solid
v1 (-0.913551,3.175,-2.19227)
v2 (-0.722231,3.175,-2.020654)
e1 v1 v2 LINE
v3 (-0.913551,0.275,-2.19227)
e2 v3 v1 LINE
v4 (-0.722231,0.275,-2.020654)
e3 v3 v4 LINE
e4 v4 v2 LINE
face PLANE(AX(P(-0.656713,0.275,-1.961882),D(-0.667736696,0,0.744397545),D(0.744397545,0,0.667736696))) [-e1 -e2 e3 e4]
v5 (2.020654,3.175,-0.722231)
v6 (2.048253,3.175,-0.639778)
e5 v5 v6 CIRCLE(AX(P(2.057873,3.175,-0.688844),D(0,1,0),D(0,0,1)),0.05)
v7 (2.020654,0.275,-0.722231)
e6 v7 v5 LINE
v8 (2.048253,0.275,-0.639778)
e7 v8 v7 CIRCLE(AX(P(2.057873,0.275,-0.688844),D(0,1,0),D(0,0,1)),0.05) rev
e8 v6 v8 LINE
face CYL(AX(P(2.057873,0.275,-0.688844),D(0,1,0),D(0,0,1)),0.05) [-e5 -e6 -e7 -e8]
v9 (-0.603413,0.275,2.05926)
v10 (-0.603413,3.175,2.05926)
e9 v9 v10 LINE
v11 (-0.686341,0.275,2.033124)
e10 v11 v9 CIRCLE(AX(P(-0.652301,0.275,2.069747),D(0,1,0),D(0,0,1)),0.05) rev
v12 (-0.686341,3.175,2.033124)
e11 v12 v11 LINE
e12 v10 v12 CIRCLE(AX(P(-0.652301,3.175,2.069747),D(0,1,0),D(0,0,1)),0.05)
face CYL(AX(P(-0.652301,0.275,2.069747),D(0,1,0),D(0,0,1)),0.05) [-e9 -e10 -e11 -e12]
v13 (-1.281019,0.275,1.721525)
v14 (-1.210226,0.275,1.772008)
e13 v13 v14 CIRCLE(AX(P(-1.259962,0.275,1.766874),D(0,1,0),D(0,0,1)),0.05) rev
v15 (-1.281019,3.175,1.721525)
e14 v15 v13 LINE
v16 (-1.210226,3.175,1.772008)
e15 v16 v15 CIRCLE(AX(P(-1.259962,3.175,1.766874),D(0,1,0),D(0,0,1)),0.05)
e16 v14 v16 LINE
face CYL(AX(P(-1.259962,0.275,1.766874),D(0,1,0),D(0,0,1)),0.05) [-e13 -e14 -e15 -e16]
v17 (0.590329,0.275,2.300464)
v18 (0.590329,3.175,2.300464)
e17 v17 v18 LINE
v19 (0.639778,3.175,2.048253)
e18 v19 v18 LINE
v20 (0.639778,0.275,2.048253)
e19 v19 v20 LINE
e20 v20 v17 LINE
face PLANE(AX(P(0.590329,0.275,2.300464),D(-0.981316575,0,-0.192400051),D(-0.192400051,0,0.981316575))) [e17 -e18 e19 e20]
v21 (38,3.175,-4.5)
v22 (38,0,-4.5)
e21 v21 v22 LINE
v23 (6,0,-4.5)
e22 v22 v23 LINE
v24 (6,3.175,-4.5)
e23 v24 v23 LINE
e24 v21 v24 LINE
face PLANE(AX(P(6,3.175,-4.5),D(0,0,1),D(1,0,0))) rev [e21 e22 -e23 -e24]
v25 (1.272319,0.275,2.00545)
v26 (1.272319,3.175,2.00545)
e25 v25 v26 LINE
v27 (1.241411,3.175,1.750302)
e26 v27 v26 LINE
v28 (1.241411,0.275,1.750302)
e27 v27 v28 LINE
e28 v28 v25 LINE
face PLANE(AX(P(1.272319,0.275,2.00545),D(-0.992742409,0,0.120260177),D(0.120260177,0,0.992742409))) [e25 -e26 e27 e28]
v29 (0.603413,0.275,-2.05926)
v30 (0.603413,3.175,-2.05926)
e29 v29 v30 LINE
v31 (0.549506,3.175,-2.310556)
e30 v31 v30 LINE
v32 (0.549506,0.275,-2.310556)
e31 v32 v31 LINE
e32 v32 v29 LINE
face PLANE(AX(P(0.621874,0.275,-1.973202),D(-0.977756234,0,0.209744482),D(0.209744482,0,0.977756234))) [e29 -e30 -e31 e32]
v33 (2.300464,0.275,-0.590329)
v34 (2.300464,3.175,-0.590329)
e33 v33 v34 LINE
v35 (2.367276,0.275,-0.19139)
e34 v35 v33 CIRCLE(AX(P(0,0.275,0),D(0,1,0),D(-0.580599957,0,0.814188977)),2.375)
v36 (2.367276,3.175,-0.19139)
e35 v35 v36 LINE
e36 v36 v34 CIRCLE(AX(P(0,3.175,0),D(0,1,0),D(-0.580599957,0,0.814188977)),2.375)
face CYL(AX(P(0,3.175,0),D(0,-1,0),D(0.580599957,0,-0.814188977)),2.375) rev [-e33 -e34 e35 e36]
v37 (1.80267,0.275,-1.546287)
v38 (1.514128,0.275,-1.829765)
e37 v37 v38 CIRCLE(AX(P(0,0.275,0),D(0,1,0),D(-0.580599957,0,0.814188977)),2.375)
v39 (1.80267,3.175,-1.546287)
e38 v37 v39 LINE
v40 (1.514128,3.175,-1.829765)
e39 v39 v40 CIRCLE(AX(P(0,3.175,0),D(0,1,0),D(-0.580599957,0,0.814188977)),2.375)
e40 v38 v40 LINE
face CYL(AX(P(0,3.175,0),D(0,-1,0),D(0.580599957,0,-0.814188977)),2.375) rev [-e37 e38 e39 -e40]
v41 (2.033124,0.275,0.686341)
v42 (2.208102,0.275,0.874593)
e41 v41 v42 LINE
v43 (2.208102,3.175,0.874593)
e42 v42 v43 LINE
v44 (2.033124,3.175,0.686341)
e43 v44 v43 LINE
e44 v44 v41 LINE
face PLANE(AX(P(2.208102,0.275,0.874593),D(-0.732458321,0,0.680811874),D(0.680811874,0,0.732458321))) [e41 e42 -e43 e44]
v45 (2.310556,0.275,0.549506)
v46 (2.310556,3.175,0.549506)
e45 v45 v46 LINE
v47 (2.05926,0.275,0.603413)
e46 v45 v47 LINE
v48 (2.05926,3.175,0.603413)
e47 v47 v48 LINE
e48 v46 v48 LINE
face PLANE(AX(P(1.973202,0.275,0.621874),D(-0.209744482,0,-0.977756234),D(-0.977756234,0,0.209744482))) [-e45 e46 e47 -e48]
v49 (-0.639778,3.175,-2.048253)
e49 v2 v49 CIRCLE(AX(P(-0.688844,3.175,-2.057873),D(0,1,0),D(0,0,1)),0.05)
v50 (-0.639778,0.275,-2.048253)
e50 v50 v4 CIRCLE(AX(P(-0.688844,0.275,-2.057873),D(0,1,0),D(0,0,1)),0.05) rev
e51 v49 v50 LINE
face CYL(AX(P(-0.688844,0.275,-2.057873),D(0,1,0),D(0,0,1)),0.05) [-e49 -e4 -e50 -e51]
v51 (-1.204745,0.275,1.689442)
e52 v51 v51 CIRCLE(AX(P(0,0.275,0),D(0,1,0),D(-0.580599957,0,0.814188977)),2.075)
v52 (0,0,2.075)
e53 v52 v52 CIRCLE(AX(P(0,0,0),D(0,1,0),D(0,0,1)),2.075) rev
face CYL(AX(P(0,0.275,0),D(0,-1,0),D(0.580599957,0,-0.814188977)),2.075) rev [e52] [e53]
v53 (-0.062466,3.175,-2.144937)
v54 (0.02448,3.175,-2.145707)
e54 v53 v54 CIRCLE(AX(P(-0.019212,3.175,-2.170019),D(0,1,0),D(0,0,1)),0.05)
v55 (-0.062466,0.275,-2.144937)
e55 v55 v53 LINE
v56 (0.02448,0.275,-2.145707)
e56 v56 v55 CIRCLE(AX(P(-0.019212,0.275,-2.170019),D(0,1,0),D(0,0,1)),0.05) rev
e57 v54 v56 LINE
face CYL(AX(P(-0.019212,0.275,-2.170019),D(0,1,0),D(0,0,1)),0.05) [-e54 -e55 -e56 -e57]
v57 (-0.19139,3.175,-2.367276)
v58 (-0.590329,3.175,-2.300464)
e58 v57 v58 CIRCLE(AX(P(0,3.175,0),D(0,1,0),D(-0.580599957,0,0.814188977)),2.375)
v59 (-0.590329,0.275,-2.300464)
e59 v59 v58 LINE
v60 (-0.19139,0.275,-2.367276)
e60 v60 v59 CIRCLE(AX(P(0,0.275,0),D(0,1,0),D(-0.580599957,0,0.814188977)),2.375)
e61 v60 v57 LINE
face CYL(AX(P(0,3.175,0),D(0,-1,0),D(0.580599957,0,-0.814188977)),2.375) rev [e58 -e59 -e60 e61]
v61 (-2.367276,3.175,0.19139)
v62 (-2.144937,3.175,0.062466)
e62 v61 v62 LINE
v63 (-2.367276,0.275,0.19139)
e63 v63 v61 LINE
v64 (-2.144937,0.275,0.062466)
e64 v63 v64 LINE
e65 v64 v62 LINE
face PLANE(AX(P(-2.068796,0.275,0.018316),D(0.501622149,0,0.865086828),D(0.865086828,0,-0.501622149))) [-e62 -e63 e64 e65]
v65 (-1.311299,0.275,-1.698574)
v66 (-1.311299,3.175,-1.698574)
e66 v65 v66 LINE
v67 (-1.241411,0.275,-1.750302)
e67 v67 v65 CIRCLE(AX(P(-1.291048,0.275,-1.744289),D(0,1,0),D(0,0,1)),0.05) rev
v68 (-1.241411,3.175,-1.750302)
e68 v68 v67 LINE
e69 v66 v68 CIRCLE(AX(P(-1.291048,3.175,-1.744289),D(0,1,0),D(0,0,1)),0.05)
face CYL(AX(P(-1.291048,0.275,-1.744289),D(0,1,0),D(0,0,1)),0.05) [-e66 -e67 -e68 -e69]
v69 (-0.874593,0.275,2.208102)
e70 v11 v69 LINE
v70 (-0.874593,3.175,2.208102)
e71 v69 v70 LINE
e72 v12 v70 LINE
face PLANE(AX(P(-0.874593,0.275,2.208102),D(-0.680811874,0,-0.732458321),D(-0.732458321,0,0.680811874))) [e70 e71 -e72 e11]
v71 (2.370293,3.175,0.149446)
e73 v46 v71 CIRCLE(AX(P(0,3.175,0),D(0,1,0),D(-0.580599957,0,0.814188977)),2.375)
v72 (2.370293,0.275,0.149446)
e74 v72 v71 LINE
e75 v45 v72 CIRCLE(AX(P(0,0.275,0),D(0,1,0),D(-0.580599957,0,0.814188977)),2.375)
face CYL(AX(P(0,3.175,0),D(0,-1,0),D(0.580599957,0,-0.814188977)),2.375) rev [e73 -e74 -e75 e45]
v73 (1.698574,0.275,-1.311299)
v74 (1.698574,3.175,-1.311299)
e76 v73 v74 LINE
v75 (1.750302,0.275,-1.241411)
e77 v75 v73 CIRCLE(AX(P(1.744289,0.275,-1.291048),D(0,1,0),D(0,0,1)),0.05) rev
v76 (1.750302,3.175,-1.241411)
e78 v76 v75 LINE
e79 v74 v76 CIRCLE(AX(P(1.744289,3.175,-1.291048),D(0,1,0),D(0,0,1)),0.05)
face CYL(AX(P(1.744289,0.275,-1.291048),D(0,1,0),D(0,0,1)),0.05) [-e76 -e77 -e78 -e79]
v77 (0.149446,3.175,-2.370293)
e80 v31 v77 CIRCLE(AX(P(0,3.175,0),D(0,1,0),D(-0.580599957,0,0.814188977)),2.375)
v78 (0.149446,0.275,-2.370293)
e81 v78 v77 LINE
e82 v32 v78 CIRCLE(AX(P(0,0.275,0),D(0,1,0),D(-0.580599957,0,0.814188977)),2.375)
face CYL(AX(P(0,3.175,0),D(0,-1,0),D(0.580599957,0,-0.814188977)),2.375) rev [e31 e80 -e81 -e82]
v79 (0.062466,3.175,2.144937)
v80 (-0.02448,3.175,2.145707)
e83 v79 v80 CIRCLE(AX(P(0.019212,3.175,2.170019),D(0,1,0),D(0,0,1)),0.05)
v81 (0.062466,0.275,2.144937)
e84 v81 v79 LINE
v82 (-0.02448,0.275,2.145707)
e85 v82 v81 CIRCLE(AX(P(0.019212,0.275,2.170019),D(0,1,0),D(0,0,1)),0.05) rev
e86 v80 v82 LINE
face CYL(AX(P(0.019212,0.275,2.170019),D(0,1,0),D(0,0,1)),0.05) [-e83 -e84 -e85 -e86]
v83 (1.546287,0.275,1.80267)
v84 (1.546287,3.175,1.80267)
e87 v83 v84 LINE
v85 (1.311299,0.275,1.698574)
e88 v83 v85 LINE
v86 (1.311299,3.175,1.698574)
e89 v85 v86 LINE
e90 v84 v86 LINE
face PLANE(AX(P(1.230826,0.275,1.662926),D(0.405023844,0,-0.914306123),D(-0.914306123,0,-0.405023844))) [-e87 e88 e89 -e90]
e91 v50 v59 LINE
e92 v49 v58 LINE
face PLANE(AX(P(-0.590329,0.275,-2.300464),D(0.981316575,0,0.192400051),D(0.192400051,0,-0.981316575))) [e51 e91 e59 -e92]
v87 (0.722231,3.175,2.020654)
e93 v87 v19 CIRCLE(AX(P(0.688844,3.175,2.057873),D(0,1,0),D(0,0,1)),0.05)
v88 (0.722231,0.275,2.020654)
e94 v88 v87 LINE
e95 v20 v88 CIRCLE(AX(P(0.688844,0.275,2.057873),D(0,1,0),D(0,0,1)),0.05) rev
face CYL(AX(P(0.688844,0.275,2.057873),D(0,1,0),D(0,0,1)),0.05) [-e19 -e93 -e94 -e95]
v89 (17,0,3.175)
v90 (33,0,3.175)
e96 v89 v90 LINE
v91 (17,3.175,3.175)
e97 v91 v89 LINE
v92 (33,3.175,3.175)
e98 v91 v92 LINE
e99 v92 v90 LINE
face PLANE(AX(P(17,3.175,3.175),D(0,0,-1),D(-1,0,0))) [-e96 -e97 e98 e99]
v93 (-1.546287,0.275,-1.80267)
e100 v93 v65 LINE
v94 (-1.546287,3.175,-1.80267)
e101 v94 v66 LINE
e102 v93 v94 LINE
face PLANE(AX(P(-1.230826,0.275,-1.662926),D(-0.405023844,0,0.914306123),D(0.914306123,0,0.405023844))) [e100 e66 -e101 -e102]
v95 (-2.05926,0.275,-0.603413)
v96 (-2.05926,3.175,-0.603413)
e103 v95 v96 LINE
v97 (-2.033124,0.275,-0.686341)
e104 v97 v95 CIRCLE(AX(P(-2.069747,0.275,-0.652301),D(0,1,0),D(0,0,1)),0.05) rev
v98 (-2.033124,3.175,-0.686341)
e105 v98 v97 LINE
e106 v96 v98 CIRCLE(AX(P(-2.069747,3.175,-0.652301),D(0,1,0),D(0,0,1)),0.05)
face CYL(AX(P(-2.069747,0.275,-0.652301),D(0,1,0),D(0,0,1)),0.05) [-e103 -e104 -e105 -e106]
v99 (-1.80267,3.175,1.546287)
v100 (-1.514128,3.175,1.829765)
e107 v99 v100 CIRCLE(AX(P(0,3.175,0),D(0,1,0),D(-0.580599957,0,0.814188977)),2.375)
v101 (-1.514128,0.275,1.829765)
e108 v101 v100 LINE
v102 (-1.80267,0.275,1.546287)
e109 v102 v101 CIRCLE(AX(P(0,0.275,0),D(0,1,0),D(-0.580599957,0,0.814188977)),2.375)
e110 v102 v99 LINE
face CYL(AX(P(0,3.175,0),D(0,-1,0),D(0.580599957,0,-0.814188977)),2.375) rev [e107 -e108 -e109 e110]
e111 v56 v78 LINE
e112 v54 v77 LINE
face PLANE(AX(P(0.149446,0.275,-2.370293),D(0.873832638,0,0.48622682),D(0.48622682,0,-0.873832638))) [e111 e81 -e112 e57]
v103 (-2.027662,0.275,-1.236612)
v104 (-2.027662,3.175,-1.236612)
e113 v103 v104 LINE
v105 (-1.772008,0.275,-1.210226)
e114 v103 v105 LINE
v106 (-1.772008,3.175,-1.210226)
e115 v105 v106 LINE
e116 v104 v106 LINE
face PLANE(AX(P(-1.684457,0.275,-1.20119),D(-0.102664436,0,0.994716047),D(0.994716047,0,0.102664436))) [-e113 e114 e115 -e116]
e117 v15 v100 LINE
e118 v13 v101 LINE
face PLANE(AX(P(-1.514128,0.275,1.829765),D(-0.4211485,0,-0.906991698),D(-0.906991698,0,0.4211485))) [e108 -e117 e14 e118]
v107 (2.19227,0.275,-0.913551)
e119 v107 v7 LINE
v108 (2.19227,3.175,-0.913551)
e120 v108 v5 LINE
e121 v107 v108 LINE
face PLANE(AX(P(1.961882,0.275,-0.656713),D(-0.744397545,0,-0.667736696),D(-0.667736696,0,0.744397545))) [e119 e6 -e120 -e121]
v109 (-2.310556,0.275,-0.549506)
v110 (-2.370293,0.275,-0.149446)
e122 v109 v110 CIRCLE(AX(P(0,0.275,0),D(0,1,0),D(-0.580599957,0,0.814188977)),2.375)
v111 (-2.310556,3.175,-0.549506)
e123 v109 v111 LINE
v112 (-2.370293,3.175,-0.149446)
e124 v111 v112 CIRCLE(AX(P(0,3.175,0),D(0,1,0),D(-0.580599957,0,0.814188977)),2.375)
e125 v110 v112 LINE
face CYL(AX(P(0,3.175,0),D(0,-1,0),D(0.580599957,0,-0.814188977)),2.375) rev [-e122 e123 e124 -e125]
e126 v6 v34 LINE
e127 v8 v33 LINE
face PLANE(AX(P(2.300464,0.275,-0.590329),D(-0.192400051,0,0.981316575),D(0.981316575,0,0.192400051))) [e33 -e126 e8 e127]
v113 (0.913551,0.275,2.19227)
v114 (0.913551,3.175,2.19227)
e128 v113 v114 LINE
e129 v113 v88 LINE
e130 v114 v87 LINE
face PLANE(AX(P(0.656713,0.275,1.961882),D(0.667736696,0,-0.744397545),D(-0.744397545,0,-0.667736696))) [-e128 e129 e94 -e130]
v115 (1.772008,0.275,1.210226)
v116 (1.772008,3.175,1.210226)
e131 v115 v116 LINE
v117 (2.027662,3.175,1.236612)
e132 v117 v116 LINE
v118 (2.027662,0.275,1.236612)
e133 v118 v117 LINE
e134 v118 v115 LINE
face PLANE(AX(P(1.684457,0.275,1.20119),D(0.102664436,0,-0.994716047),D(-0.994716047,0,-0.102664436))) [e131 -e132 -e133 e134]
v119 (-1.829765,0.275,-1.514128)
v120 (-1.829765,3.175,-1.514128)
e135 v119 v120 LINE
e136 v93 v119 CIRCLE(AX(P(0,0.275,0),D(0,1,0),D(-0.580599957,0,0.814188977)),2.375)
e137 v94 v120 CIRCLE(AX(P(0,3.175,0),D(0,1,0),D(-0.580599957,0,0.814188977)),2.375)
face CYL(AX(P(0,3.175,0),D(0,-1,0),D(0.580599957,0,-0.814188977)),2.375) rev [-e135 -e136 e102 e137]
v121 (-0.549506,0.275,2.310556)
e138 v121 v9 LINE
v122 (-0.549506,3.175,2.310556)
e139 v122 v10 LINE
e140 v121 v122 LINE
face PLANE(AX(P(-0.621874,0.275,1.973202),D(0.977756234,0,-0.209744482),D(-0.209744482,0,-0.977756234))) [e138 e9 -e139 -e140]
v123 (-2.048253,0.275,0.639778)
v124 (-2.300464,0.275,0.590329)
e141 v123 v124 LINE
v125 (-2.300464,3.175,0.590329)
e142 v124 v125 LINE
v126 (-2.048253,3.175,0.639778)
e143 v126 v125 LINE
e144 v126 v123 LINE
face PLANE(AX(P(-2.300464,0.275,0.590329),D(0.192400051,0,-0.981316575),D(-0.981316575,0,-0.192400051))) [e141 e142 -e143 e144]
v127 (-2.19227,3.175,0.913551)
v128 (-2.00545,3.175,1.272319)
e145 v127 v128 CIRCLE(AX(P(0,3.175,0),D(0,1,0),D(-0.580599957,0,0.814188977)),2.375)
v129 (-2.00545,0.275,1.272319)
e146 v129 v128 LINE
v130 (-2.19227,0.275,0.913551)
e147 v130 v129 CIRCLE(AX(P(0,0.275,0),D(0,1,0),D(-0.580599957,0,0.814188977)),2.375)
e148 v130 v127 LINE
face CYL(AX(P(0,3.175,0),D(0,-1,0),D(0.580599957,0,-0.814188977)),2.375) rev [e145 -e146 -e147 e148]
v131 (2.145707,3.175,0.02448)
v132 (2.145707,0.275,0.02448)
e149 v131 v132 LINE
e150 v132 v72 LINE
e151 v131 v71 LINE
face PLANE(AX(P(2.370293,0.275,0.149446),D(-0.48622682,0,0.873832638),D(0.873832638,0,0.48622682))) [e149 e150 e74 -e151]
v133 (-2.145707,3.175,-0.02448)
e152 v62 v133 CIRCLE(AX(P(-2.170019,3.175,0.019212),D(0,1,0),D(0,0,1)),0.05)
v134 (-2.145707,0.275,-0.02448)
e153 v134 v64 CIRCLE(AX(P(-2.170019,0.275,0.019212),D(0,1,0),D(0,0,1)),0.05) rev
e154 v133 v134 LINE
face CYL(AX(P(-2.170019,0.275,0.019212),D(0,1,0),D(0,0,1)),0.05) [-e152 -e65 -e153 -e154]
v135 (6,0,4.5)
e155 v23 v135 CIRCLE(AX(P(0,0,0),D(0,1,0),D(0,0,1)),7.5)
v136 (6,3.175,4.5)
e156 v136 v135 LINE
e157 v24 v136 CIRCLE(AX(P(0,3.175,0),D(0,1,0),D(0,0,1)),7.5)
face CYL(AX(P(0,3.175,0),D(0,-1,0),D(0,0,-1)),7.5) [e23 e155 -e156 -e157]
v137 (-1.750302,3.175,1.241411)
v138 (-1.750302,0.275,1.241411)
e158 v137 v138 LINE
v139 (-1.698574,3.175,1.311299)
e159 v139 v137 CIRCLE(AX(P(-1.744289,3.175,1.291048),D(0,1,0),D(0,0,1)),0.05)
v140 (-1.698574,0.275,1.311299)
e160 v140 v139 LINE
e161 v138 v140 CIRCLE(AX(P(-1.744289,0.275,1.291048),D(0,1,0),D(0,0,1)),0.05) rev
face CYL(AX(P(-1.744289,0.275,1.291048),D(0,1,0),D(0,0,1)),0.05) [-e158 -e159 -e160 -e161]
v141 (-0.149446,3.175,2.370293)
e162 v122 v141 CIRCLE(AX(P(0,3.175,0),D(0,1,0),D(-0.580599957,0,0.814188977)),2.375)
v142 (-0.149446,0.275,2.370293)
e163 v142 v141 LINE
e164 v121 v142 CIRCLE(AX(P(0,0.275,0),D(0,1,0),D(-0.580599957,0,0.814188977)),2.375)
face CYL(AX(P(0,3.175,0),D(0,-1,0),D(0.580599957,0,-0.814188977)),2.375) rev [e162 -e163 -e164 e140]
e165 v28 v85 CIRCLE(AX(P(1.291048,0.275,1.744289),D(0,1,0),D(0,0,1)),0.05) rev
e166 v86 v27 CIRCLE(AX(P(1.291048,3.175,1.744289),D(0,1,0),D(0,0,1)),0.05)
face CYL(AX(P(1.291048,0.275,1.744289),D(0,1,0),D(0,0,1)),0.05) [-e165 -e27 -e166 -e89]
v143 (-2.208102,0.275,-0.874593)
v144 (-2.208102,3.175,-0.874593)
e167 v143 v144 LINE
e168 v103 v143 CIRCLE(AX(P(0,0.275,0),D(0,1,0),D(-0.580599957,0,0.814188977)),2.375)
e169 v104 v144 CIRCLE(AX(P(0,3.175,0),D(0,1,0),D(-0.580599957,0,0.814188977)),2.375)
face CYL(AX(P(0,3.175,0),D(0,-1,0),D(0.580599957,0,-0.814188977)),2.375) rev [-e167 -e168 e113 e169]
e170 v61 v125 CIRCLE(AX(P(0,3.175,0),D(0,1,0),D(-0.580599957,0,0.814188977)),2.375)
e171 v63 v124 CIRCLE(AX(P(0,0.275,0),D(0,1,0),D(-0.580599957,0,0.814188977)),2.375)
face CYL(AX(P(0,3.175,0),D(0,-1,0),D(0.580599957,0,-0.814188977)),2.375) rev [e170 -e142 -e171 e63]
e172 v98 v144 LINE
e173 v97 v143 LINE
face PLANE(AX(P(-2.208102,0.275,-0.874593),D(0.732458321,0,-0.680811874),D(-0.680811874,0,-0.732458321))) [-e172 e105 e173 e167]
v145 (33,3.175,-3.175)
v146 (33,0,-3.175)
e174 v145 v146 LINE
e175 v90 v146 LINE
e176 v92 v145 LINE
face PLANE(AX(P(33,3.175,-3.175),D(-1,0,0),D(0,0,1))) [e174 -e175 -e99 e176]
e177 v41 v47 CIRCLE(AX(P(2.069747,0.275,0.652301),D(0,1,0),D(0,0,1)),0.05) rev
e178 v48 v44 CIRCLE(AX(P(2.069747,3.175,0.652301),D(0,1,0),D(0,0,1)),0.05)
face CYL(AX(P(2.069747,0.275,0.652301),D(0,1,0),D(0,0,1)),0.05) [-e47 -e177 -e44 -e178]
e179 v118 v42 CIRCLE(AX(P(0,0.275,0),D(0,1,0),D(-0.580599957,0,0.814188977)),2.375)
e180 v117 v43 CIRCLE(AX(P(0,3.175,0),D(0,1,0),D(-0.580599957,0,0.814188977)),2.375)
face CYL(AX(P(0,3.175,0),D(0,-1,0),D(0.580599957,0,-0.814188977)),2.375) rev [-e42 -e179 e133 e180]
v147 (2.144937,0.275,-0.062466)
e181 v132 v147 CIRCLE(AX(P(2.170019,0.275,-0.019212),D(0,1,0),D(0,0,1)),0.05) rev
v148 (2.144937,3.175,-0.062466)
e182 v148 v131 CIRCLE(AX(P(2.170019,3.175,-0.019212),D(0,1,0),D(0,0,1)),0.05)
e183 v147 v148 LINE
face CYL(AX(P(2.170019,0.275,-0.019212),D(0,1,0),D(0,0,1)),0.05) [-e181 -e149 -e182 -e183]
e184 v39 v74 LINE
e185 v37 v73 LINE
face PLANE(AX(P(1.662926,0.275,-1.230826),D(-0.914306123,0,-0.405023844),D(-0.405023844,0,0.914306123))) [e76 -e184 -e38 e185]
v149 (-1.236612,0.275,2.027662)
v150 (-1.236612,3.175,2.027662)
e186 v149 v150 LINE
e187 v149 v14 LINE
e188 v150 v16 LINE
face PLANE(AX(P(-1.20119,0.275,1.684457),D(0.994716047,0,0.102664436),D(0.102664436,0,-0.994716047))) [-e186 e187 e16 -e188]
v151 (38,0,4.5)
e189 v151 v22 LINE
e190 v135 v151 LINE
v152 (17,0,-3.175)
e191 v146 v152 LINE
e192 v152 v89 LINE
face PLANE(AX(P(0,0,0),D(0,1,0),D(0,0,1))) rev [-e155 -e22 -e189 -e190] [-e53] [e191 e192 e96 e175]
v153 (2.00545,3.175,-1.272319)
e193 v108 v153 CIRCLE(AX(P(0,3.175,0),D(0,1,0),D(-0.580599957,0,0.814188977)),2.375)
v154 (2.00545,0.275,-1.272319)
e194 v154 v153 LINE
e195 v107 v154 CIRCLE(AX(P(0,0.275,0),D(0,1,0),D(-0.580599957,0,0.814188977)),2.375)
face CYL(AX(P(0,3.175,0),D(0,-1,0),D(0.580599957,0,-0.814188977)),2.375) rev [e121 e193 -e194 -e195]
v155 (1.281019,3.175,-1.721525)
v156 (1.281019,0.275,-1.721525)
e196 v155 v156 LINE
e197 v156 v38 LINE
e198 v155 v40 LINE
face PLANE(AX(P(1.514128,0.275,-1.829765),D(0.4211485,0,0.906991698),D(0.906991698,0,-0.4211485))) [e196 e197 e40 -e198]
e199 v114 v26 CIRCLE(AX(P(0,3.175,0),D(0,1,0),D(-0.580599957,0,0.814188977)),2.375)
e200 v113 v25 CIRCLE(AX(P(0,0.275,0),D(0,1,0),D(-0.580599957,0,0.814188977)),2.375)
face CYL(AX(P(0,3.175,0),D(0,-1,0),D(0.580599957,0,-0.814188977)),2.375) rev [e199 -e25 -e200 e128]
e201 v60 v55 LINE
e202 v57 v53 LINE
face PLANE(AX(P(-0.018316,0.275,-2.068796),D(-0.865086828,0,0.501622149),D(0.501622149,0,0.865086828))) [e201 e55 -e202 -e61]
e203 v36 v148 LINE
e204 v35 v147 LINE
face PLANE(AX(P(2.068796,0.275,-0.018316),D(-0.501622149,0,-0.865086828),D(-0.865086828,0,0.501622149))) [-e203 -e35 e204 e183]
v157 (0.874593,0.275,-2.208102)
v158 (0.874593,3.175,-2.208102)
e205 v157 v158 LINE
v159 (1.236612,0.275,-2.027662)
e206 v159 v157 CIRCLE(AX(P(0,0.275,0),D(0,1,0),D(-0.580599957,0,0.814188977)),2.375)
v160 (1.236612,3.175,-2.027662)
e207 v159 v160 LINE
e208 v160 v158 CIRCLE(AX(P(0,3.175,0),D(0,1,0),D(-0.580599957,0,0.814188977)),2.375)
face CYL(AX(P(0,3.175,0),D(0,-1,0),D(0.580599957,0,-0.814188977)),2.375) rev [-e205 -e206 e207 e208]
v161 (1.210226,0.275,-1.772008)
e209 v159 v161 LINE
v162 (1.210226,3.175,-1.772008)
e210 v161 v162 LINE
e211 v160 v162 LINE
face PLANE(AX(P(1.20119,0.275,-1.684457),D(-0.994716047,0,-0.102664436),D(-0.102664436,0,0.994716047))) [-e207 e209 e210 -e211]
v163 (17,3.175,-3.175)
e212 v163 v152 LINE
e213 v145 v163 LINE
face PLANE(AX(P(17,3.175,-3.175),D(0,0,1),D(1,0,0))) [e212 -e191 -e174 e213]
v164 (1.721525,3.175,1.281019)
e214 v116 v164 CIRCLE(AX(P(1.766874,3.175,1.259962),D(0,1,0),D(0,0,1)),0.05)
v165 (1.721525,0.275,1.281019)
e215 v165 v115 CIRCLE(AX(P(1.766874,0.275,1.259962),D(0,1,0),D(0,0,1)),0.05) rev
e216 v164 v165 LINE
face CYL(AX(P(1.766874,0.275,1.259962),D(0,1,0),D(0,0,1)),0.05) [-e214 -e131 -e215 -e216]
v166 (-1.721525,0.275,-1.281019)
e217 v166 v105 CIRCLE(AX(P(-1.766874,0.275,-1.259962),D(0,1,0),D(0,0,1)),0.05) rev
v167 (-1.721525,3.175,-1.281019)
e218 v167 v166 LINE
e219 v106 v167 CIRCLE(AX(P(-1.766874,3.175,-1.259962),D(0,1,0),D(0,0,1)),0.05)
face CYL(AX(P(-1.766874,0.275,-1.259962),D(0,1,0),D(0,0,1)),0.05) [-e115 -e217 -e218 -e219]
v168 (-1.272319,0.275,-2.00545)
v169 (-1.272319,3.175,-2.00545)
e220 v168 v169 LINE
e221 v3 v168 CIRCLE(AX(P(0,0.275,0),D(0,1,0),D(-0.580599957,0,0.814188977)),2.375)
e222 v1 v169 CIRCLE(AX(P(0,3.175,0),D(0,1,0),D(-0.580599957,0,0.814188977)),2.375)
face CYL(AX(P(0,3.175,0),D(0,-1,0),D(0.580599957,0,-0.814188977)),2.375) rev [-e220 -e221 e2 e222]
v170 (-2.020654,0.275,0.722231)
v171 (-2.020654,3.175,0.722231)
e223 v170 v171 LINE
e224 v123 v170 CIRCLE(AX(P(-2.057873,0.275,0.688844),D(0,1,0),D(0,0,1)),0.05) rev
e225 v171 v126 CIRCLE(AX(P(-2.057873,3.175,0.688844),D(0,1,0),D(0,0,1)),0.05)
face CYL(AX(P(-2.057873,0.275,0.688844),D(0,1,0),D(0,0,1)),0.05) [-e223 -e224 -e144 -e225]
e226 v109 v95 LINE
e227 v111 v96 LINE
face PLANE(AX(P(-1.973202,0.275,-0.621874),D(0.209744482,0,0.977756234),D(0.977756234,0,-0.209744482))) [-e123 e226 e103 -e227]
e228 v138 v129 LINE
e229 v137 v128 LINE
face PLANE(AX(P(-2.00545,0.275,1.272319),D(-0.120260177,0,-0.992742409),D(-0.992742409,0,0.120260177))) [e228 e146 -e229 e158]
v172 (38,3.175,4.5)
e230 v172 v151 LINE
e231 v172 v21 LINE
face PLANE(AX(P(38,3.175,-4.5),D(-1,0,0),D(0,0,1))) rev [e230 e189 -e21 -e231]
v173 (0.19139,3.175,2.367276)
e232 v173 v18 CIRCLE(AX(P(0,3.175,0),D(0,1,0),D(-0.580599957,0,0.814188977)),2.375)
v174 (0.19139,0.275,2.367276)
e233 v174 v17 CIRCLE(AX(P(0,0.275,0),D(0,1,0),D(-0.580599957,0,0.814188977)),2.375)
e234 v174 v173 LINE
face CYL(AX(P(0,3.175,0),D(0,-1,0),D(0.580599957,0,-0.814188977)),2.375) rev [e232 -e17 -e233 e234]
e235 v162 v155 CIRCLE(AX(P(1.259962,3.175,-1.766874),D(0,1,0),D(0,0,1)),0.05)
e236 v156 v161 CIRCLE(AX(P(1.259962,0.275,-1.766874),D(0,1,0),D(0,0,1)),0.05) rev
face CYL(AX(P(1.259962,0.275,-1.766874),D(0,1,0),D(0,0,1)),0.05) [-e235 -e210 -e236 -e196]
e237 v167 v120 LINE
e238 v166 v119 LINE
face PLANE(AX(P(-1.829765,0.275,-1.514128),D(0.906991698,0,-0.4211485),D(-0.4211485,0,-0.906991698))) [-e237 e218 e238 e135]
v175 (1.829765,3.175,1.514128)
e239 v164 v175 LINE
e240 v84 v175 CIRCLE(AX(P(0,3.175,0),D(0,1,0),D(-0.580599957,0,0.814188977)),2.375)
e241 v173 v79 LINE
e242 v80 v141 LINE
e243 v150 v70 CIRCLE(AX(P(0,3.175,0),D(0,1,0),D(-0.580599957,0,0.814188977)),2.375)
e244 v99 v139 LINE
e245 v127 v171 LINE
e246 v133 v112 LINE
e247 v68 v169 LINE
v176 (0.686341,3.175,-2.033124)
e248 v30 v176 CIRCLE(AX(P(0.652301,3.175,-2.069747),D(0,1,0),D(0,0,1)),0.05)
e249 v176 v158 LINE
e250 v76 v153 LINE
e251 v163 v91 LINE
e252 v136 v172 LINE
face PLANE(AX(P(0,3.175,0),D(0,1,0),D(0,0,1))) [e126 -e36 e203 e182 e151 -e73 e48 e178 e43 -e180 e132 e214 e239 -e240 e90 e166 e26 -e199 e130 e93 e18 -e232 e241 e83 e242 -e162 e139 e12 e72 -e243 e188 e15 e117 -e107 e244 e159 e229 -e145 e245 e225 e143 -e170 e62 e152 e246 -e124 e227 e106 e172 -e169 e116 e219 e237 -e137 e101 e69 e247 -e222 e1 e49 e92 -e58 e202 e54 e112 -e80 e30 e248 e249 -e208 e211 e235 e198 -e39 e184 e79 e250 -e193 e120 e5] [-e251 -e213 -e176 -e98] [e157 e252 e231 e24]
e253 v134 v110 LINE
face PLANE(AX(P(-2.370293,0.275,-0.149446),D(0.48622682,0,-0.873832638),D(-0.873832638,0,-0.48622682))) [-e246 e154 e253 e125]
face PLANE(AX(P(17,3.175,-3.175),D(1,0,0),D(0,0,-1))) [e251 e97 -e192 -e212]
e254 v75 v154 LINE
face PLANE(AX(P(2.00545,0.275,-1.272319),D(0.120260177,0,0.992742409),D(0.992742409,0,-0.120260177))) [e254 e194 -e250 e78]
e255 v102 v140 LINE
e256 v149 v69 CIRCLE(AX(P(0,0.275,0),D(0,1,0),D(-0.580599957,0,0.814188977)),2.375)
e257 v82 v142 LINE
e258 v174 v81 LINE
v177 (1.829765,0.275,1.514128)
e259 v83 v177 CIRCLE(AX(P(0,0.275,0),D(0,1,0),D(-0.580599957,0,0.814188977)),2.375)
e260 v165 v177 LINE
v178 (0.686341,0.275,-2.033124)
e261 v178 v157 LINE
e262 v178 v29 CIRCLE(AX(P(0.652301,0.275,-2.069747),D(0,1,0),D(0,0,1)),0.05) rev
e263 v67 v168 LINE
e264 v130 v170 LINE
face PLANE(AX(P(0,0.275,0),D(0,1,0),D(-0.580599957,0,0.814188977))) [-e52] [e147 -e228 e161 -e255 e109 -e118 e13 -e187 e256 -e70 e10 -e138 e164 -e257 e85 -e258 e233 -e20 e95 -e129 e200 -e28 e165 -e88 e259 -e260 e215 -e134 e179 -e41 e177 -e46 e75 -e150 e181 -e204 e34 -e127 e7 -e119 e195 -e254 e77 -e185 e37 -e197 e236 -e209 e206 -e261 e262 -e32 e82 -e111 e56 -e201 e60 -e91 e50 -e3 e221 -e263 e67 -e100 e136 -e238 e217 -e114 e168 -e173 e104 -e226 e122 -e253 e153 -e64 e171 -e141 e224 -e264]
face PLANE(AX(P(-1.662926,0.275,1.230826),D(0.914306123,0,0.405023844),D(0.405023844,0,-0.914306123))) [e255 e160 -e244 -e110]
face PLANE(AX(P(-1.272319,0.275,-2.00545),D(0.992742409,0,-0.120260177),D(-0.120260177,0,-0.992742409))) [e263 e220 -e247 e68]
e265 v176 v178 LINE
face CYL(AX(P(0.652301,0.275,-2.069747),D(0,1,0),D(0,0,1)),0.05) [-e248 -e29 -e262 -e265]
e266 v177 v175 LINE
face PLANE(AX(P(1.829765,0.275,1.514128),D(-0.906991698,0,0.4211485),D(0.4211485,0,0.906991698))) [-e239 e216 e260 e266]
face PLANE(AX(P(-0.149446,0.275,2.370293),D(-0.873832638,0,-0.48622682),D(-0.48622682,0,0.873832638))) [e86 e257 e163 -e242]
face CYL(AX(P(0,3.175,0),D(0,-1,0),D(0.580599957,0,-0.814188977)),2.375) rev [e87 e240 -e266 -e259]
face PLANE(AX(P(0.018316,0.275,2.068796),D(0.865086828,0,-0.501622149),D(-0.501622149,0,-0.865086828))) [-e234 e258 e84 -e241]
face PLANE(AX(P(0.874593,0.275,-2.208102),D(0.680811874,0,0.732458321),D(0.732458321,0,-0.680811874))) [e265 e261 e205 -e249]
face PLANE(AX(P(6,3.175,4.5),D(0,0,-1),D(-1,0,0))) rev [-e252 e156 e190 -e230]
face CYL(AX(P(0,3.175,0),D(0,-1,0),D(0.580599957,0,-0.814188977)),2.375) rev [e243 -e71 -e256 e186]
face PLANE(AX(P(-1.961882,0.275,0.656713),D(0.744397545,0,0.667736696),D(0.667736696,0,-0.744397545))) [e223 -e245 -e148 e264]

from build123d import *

# Parameters (mm, degrees)
SKETCH1_R             = 2
SKETCH1_W             = 16
SKETCH1_H             = 6.35
BOSS_EXTRUDE1_DEPTH   = 3.175
INDENT2_START         = 0.275
INDENT2_OUTLINE_R     = 2
INDENT2_DEPTH         = 2.9
INDENT2_2_OUTLINE_R   = 2.075
INDENT2_2_OUTLINE_R_2 = 2
INDENT2_2_DEPTH       = 0.275
FILLET4_R             = 0.05


# Read off the part's stored shape, not the designer's step: Indent2
with BuildPart() as part:
    # Sketch1 → Boss-Extrude1 (new body)
    with BuildSketch(Plane(origin=(0, 0, 0), x_dir=(1, 0, 0), z_dir=(0, 1, 0))):
        with BuildLine():
            Line((6, 4.5), (38, 4.5))
            Line((38, 4.5), (38, -4.5))
            Line((38, -4.5), (6, -4.5))
            ThreePointArc((6, -4.5), (-7.5, 0), (6, 4.5))
        make_face()
        with Locations(Location((0, 0, 0), (0, 0, 270))):
            Circle(SKETCH1_R, mode=Mode.SUBTRACT)
        with Locations((25, 0)):
            Rectangle(SKETCH1_W, SKETCH1_H, mode=Mode.SUBTRACT)
    extrude(amount=BOSS_EXTRUDE1_DEPTH)

    # Indent2 outline → Indent2 (cut)
    with BuildSketch(Plane(origin=(0, 0, 0), x_dir=(1, 0, 0), z_dir=(0, 1, 0)).offset(INDENT2_START)):
        with BuildLine():
            Line((1.973202198, -0.621873827), (2.310555802, -0.549506038))
            ThreePointArc((2.310555802, -0.549506038), (2.348957068, -0.350750187), (2.370293408, -0.149446173))
            Line((2.370293408, -0.149446173), (2.068796389, 0.018315857))
            Line((2.068796389, 0.018315857), (2.367275856, 0.191389711))
            ThreePointArc((2.367275856, 0.191389711), (2.342378694, 0.392284402), (2.300464399, 0.590329188))
            Line((2.300464399, 0.590329188), (1.961882375, 0.656712657))
            Line((1.961882375, 0.656712657), (2.192270455, 0.913550902))
            ThreePointArc((2.192270455, 0.913550902), (2.106511974, 1.096919461), (2.005449906, 1.272319015))
            Line((2.005449906, 1.272319015), (1.662925646, 1.230825847))
            Line((1.662925646, 1.230825847), (1.802670348, 1.546287365))
            ThreePointArc((1.802670348, 1.546287365), (1.664445185, 1.6941804), (1.514128003, 1.829765392))
            Line((1.514128003, 1.829765392), (1.201190168, 1.684457227))
            Line((1.201190168, 1.684457227), (1.236612307, 2.027662448))
            ThreePointArc((1.236612307, 2.027662448), (1.059450904, 2.125603157), (0.874592702, 2.208101584))
            Line((0.874592702, 2.208101584), (0.621873827, 1.973202197))
            Line((0.621873827, 1.973202197), (0.549506038, 2.310555802))
            ThreePointArc((0.549506038, 2.310555802), (0.350750187, 2.348957068), (0.149446173, 2.370293408))
            Line((0.149446173, 2.370293408), (-0.018315857, 2.068796389))
            Line((-0.018315857, 2.068796389), (-0.191389711, 2.367275856))
            ThreePointArc((-0.191389711, 2.367275856), (-0.392284402, 2.342378694), (-0.590329188, 2.300464399))
            Line((-0.590329188, 2.300464399), (-0.656712657, 1.961882375))
            Line((-0.656712657, 1.961882375), (-0.913550902, 2.192270455))
            ThreePointArc((-0.913550902, 2.192270455), (-1.096919461, 2.106511974), (-1.272319015, 2.005449905))
            Line((-1.272319015, 2.005449905), (-1.230825847, 1.662925646))
            Line((-1.230825847, 1.662925646), (-1.546287365, 1.802670348))
            ThreePointArc((-1.546287365, 1.802670348), (-1.6941804, 1.664445185), (-1.829765392, 1.514128003))
            Line((-1.829765392, 1.514128003), (-1.684457227, 1.201190168))
            Line((-1.684457227, 1.201190168), (-2.027662448, 1.236612307))
            ThreePointArc((-2.027662448, 1.236612307), (-2.125603157, 1.059450904), (-2.208101584, 0.874592702))
            Line((-2.208101584, 0.874592702), (-1.973202197, 0.621873827))
            Line((-1.973202197, 0.621873827), (-2.310555802, 0.549506038))
            ThreePointArc((-2.310555802, 0.549506038), (-2.348957068, 0.350750187), (-2.370293408, 0.149446173))
            Line((-2.370293408, 0.149446173), (-2.068796389, -0.018315857))
            Line((-2.068796389, -0.018315857), (-2.367275856, -0.191389711))
            ThreePointArc((-2.367275856, -0.191389711), (-2.342378694, -0.392284402), (-2.300464399, -0.590329188))
            Line((-2.300464399, -0.590329188), (-1.961882375, -0.656712657))
            Line((-1.961882375, -0.656712657), (-2.192270455, -0.913550902))
            ThreePointArc((-2.192270455, -0.913550902), (-2.106511974, -1.096919461), (-2.005449905, -1.272319015))
            Line((-2.005449905, -1.272319015), (-1.662925646, -1.230825847))
            Line((-1.662925646, -1.230825847), (-1.802670348, -1.546287365))
            ThreePointArc((-1.802670348, -1.546287365), (-1.664445185, -1.6941804), (-1.514128003, -1.829765392))
            Line((-1.514128003, -1.829765392), (-1.201190168, -1.684457227))
            Line((-1.201190168, -1.684457227), (-1.236612307, -2.027662448))
            ThreePointArc((-1.236612307, -2.027662448), (-1.059450904, -2.125603157), (-0.874592702, -2.208101584))
            Line((-0.874592702, -2.208101584), (-0.621873827, -1.973202198))
            Line((-0.621873827, -1.973202198), (-0.549506038, -2.310555802))
            ThreePointArc((-0.549506038, -2.310555802), (-0.350750187, -2.348957068), (-0.149446173, -2.370293408))
            Line((-0.149446173, -2.370293408), (0.018315857, -2.068796389))
            Line((0.018315857, -2.068796389), (0.191389711, -2.367275856))
            ThreePointArc((0.191389711, -2.367275856), (0.392284402, -2.342378694), (0.590329188, -2.300464399))
            Line((0.590329188, -2.300464399), (0.656712657, -1.961882375))
            Line((0.656712657, -1.961882375), (0.913550902, -2.192270455))
            ThreePointArc((0.913550902, -2.192270455), (1.096919461, -2.106511974), (1.272319015, -2.005449906))
            Line((1.272319015, -2.005449906), (1.230825847, -1.662925646))
            Line((1.230825847, -1.662925646), (1.546287365, -1.802670348))
            ThreePointArc((1.546287365, -1.802670348), (1.6941804, -1.664445185), (1.829765392, -1.514128003))
            Line((1.829765392, -1.514128003), (1.684457227, -1.201190168))
            Line((1.684457227, -1.201190168), (2.027662448, -1.236612307))
            ThreePointArc((2.027662448, -1.236612307), (2.125603157, -1.059450904), (2.208101584, -0.874592702))
            Line((2.208101584, -0.874592702), (1.973202198, -0.621873827))
        make_face()
        Circle(INDENT2_OUTLINE_R, mode=Mode.SUBTRACT)
    extrude(amount=INDENT2_DEPTH, mode=Mode.SUBTRACT)

    # Indent2 2 outline → Indent2 2 (cut)
    with BuildSketch(Plane(origin=(0, 0, 0), x_dir=(1, 0, 0), z_dir=(0, 1, 0))):
        Circle(INDENT2_2_OUTLINE_R)
        Circle(INDENT2_2_OUTLINE_R_2, mode=Mode.SUBTRACT)
    extrude(amount=INDENT2_2_DEPTH, mode=Mode.SUBTRACT)

    # Fillet4
    # the kernel refuses this fillet: 0.05 mm, written as the material it takes off along each edge
    with BuildSketch(Plane(origin=(2.068796389, 0.275, -0.018315857), x_dir=(0.8650868282896619, 0, -0.501622148155096), z_dir=(0, 1, 0)), Plane(origin=(1.961882375, 0.275, -0.656712657), x_dir=(0.6677366959947866, 0, -0.7443975448790559), z_dir=(0, 1, 0)), Plane(origin=(0.621873827, 0.275, -1.973202197), x_dir=(-0.20974448107145283, 0, -0.9777562337618038), z_dir=(0, 1, 0)), Plane(origin=(-0.018315857, 0.275, -2.068796389), x_dir=(-0.501622148155096, 0, -0.8650868282896619), z_dir=(0, 1, 0)), Plane(origin=(-0.656712657, 0.275, -1.961882375), x_dir=(-0.7443975448790559, 0, -0.6677366959947866), z_dir=(0, 1, 0)), Plane(origin=(-1.973202197, 0.275, -0.621873827), x_dir=(-0.9777562337618038, 0, 0.20974448107145283), z_dir=(0, 1, 0)), Plane(origin=(-2.068796389, 0.275, 0.018315857), x_dir=(-0.8650868282896619, 0, 0.501622148155096), z_dir=(0, 1, 0)), Plane(origin=(-1.961882375, 0.275, 0.656712657), x_dir=(-0.6677366959947866, 0, 0.7443975448790559), z_dir=(0, 1, 0)), Plane(origin=(0.018315857, 0.275, 2.068796389), x_dir=(0.501622148155096, 0, 0.8650868282896619), z_dir=(0, 1, 0)), Plane(origin=(0.656712657, 0.275, 1.961882375), x_dir=(0.7443975448790559, 0, 0.6677366959947866), z_dir=(0, 1, 0))) as fillet4_piece_1:
        with BuildLine():
            CenterArc((FILLET4_R * 1.76030903483, -FILLET4_R), FILLET4_R, 90, 120.799739684)
            Line((FILLET4_R * 0.901346811508, -FILLET4_R * 1.51203896229), (0, 0))
            Line((0, 0), (FILLET4_R * 1.76030903483, 0))
        make_face()
    extrude(amount=3.120038629, mode=Mode.SUBTRACT)
    with BuildSketch(Plane(origin=(1.662925646, 0.275, -1.230825847), x_dir=(0.40502384395389723, 0, -0.9143061226027139), z_dir=(0, 1, 0)), Plane(origin=(-1.230825847, 0.275, -1.662925646), x_dir=(-0.9143061226027142, 0, -0.40502384395389696), z_dir=(0, 1, 0)), Plane(origin=(-1.662925646, 0.275, 1.230825847), x_dir=(-0.40502384395389696, 0, 0.9143061226027142), z_dir=(0, 1, 0)), Plane(origin=(-0.621873827, 0.275, 1.973202198), x_dir=(0.20974448166583565, 0, 0.977756233634299), z_dir=(0, 1, 0)), Plane(origin=(1.230825847, 0.275, 1.662925646), x_dir=(0.9143061226027139, 0, 0.40502384395389723), z_dir=(0, 1, 0)), Plane(origin=(1.973202198, 0.275, 0.621873827), x_dir=(0.977756233634299, 0, -0.20974448166583565), z_dir=(0, 1, 0))) as fillet4_piece_2:
        with BuildLine():
            CenterArc((FILLET4_R * 1.76030903185, -FILLET4_R), FILLET4_R, 90, 120.799739601)
            Line((FILLET4_R * 0.901346807787, -FILLET4_R * 1.51203896104), (0, 0))
            Line((0, 0), (FILLET4_R * 1.76030903185, 0))
        make_face()
    extrude(amount=3.120038629, mode=Mode.SUBTRACT)
    with BuildSketch(Plane(origin=(1.201190168, 0.275, -1.684457227), x_dir=(0.10266443492130879, 0, -0.9947160468205429), z_dir=(0, 1, 0)), Plane(origin=(-1.684457227, 0.275, -1.201190168), x_dir=(-0.9947160468205429, 0, -0.10266443492130879), z_dir=(0, 1, 0)), Plane(origin=(-1.201190168, 0.275, 1.684457227), x_dir=(-0.10266443492130879, 0, 0.9947160468205429), z_dir=(0, 1, 0)), Plane(origin=(1.684457227, 0.275, 1.201190168), x_dir=(0.9947160468205429, 0, 0.10266443492130879), z_dir=(0, 1, 0))) as fillet4_piece_3:
        with BuildLine():
            CenterArc((FILLET4_R * 1.7603090297, -FILLET4_R), FILLET4_R, 90, 120.799739541)
            Line((FILLET4_R * 0.901346805096, -FILLET4_R * 1.51203896014), (0, 0))
            Line((0, 0), (FILLET4_R * 1.7603090297, 0))
        make_face()
    extrude(amount=3.120038629, mode=Mode.SUBTRACT)


solid = part.part
